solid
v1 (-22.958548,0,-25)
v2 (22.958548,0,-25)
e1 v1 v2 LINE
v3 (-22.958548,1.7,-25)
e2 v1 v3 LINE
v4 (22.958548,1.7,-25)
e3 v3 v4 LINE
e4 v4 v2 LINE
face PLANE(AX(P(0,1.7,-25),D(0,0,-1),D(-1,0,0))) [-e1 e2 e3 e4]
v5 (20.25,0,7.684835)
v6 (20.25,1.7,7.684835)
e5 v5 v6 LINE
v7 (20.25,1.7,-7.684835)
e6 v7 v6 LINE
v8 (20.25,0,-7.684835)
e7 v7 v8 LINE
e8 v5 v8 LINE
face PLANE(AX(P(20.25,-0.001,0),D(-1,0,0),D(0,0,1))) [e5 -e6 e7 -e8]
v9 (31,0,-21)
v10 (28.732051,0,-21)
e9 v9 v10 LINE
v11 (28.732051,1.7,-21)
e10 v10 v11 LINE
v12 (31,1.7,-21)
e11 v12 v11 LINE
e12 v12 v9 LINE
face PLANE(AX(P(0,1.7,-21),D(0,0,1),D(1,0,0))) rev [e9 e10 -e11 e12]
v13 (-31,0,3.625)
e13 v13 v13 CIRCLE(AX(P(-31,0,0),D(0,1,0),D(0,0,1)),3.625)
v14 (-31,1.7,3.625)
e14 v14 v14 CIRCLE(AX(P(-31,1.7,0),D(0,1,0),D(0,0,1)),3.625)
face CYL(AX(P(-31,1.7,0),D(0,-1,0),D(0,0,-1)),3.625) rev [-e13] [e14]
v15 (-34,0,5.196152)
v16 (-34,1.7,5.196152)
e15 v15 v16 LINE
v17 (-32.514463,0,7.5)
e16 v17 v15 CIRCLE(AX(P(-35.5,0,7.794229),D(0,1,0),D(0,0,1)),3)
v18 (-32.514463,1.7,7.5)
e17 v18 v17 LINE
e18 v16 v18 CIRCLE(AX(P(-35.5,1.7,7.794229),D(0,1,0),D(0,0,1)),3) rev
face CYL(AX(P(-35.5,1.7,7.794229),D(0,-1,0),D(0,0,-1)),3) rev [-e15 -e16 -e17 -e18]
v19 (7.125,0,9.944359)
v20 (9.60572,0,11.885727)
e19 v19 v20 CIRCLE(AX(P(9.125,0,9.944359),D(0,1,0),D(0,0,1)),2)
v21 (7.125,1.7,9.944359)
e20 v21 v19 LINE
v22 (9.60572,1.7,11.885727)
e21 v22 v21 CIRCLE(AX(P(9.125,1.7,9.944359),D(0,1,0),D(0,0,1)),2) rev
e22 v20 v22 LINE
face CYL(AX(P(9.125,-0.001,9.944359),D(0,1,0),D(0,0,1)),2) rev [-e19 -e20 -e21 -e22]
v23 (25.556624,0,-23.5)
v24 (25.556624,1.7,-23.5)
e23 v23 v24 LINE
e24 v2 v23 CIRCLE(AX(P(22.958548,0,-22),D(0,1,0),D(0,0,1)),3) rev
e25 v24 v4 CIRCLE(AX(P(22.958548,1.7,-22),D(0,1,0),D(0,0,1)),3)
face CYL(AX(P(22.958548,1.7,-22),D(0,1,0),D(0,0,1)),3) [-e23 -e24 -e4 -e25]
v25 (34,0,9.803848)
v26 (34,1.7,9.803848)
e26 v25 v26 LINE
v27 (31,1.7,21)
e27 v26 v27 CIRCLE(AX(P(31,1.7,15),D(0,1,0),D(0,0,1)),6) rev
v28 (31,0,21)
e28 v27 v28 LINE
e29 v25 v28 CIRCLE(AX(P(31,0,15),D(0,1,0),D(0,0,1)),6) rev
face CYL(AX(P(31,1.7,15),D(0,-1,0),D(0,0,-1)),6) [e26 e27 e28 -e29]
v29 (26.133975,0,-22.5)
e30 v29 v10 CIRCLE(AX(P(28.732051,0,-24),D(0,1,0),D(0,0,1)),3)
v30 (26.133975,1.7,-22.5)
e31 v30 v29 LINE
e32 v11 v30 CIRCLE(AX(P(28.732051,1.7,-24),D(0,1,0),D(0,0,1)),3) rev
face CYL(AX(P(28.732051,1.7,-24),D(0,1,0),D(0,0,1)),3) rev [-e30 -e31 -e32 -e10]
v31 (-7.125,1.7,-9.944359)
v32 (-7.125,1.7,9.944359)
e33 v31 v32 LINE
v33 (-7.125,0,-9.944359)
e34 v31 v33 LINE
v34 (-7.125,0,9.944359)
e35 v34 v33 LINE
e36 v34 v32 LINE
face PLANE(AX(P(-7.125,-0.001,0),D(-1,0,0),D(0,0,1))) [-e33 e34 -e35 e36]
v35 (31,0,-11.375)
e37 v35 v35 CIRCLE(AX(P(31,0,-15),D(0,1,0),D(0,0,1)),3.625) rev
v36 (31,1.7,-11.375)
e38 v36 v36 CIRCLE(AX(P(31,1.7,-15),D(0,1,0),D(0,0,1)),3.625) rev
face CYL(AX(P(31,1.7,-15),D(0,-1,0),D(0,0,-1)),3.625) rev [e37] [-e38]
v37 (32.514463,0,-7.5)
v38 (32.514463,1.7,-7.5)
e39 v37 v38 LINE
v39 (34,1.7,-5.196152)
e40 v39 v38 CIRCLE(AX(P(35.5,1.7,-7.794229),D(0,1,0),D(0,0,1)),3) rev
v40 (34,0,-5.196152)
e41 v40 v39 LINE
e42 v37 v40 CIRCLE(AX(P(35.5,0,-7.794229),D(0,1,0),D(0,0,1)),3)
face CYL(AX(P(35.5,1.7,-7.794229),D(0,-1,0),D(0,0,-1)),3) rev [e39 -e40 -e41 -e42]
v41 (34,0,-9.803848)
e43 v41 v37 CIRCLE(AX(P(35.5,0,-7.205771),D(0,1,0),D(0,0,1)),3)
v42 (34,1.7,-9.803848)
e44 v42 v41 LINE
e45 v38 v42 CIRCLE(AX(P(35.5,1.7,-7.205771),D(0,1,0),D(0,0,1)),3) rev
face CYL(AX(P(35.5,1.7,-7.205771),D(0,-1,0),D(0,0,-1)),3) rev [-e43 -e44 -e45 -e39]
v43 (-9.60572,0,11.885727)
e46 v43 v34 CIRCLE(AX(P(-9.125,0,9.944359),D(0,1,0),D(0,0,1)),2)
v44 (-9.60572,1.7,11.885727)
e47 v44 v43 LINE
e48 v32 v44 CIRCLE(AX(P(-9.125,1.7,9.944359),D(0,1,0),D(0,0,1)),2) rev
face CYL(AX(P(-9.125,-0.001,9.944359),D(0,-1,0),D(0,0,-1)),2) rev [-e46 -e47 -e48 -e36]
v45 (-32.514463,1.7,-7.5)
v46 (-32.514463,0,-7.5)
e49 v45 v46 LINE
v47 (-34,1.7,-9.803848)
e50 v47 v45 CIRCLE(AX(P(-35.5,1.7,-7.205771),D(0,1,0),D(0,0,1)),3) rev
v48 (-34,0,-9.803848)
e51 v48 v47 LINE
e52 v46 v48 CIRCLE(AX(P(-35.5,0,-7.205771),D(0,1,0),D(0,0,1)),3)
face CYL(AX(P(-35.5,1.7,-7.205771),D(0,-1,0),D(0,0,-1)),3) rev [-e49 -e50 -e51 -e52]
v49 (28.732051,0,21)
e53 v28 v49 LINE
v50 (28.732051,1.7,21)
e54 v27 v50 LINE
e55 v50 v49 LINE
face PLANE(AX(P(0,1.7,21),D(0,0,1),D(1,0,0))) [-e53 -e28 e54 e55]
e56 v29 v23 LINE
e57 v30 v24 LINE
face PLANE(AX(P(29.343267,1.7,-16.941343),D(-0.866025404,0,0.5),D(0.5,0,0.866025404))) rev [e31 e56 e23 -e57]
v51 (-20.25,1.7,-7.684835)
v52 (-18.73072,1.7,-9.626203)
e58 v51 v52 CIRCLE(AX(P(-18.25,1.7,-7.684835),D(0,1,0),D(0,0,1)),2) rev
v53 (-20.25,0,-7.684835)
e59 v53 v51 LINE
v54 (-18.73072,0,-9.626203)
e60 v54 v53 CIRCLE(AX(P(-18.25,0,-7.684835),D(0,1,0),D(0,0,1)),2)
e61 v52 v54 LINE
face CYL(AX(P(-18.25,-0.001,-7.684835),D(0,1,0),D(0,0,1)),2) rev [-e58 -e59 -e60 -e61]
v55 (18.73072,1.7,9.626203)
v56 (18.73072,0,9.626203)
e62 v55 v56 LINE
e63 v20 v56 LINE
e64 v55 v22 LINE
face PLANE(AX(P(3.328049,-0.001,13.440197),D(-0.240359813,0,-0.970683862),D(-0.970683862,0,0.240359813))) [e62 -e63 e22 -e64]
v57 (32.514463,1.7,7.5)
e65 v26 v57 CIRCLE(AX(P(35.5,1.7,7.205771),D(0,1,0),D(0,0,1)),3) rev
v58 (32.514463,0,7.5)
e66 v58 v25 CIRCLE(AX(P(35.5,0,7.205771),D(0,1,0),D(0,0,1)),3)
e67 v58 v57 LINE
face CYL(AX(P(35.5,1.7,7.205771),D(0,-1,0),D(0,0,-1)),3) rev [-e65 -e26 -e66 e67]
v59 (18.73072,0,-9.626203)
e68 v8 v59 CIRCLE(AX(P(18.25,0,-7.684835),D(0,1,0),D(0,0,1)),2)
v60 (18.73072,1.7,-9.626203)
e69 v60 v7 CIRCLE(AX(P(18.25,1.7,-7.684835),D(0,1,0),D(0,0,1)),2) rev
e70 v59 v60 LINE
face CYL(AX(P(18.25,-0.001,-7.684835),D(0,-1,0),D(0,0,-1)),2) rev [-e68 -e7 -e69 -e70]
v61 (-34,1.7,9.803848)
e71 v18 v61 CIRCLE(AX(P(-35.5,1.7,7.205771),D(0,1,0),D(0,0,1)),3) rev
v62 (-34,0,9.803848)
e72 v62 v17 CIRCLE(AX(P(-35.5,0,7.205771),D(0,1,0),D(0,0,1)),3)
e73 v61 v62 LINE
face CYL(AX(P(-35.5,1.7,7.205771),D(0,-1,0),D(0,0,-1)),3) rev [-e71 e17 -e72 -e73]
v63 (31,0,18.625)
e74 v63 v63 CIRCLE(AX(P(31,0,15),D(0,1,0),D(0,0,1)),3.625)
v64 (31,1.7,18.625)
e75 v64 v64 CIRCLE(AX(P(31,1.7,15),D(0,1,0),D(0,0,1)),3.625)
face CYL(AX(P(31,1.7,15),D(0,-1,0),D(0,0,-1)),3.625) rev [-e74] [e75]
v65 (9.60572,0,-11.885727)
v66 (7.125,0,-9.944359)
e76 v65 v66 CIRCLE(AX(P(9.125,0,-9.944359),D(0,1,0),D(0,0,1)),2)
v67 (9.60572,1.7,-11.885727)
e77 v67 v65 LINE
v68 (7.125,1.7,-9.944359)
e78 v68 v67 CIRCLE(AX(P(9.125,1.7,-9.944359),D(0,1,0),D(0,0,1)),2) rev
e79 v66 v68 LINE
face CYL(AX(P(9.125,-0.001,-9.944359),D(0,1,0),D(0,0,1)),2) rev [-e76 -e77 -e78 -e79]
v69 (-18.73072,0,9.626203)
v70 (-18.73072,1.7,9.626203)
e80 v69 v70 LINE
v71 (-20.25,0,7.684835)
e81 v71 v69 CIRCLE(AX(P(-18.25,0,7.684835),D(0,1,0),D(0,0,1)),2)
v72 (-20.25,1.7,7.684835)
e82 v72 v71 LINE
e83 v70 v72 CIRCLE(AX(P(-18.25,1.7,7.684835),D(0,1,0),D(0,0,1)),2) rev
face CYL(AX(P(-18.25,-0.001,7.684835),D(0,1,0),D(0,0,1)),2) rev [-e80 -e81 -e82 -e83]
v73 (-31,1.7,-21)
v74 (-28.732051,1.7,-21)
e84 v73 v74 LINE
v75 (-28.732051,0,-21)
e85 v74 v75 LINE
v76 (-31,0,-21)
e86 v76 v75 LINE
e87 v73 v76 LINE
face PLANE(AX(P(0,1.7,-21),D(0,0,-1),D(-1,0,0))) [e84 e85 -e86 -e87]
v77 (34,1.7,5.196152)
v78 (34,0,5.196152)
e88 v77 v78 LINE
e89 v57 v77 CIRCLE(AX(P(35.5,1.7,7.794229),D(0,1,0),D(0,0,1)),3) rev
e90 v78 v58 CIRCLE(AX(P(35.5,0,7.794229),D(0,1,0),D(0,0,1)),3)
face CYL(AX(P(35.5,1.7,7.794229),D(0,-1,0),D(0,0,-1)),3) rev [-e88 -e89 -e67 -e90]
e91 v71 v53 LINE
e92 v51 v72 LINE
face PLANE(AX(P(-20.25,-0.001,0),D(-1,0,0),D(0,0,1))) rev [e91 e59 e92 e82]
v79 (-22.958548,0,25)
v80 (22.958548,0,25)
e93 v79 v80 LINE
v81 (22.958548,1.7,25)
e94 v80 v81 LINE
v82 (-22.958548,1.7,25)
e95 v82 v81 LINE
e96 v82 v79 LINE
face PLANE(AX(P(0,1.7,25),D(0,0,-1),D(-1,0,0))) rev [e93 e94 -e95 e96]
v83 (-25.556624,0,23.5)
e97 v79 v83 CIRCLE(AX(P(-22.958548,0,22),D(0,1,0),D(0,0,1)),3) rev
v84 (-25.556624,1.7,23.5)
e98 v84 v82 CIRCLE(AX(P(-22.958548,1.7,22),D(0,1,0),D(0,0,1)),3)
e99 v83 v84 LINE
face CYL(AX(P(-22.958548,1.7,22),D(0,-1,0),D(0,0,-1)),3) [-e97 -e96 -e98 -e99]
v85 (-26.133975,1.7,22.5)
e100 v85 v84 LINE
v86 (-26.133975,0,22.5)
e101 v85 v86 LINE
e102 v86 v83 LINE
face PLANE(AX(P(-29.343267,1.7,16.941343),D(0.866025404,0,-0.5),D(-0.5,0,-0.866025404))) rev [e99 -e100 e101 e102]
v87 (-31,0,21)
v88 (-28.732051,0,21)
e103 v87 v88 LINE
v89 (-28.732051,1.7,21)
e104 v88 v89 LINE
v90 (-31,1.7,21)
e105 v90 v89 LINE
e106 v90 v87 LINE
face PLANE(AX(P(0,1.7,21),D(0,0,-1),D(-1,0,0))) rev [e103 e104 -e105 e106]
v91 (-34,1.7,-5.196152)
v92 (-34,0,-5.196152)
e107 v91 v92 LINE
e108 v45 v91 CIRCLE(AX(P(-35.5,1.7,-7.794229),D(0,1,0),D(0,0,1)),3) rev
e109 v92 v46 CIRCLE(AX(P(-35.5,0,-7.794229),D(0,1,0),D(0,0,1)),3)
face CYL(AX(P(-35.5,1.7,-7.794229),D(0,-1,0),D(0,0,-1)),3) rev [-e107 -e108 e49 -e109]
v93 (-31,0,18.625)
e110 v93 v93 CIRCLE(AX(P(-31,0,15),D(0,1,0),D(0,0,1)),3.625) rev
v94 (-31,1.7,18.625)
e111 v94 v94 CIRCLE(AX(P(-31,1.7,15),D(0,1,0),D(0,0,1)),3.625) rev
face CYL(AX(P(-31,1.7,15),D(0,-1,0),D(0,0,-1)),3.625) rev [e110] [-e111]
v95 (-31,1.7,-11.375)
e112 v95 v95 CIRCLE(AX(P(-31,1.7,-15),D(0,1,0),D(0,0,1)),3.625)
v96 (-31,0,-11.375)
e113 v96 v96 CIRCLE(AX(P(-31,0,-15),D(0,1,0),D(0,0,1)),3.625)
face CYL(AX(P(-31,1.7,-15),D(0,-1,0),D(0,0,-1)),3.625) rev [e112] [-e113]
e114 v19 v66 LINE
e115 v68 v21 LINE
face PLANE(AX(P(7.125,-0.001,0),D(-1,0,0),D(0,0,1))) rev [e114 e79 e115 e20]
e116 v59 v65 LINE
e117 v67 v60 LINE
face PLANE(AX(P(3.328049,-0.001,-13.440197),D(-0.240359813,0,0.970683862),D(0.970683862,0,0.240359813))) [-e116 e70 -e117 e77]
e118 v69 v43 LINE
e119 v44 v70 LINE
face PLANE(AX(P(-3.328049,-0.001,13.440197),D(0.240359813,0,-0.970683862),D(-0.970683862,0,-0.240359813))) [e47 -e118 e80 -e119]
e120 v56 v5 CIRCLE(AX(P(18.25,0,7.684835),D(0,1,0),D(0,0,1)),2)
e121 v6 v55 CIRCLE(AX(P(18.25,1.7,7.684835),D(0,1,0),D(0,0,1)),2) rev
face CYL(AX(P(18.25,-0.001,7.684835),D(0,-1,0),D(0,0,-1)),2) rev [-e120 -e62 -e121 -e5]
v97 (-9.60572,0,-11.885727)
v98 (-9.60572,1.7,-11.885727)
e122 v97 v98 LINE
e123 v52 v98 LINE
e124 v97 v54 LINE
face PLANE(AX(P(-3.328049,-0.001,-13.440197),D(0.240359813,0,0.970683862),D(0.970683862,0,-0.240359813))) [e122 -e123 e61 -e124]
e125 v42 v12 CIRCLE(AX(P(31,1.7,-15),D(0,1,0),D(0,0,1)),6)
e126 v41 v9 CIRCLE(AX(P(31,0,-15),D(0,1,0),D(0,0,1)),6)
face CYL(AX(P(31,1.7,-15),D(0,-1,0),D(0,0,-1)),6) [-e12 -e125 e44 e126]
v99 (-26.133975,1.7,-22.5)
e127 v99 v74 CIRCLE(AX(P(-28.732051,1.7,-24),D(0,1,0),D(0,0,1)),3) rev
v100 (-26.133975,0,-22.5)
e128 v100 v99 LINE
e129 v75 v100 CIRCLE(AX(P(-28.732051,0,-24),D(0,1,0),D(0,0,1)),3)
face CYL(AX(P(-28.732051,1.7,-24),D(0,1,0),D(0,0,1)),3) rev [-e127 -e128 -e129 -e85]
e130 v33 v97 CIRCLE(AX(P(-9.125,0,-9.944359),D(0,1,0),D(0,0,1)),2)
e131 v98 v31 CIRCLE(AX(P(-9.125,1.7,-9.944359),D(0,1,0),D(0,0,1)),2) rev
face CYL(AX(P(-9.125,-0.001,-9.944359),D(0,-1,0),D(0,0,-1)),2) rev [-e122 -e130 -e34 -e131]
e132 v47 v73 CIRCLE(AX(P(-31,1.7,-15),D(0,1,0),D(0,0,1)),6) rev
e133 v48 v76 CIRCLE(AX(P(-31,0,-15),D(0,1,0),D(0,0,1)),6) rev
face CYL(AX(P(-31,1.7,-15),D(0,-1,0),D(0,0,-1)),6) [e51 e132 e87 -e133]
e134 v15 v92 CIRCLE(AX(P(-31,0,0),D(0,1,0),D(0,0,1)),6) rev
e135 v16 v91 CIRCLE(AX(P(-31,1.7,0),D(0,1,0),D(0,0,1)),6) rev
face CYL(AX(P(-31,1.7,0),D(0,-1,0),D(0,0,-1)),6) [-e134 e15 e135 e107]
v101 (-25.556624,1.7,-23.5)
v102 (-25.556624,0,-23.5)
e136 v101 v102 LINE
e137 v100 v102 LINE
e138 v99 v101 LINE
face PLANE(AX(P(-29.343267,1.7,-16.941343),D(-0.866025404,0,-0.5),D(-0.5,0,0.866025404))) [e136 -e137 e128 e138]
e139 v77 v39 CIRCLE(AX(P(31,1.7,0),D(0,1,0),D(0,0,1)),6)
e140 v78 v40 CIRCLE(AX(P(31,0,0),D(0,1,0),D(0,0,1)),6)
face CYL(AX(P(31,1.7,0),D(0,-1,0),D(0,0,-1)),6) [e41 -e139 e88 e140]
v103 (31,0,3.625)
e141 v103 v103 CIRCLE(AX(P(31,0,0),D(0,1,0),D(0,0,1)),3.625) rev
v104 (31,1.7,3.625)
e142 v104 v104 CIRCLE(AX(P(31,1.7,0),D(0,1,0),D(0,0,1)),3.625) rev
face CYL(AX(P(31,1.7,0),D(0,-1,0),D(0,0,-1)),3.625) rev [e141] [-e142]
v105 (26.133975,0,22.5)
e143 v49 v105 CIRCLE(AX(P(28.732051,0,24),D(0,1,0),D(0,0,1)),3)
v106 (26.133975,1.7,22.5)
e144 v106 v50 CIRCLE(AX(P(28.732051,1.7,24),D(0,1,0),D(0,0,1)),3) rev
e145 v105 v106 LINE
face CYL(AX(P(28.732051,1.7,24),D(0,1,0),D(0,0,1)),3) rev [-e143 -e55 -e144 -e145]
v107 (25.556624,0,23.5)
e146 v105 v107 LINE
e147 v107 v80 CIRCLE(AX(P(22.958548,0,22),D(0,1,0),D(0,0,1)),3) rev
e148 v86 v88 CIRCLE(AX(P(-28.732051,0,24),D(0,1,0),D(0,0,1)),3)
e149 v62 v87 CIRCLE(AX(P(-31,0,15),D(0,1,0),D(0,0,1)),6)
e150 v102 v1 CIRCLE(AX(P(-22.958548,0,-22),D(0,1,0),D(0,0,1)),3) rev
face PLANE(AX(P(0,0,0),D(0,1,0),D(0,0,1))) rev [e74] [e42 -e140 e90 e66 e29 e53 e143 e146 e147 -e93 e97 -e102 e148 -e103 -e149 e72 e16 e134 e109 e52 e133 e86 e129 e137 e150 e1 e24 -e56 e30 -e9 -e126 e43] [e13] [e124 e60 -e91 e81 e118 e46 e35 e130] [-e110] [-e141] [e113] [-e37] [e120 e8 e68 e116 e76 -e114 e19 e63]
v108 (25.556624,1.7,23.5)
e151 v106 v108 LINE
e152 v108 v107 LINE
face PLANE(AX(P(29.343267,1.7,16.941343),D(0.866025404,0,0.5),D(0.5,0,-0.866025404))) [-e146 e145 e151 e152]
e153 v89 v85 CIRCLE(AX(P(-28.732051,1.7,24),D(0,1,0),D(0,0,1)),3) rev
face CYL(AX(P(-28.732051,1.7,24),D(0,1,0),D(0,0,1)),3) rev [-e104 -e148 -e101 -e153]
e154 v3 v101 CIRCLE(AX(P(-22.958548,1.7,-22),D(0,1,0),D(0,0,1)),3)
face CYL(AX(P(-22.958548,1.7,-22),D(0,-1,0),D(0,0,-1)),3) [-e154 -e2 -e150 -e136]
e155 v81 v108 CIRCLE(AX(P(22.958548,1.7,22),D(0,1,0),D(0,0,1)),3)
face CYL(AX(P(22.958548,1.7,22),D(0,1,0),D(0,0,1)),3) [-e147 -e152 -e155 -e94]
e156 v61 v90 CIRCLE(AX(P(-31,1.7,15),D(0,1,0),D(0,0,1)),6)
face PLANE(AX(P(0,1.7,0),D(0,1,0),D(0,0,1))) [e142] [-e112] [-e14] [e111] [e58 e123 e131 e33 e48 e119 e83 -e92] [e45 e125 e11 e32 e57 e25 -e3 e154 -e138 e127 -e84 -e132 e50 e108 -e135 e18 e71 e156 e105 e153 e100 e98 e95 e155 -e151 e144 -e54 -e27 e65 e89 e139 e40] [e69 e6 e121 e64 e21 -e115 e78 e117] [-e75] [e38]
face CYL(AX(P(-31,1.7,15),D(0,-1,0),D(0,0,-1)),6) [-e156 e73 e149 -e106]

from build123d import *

# Parameters (mm, degrees)
SKETCH1_R           = 6
SKETCH1_R_2         = 3.625
BOSS_EXTRUDE1_DEPTH = 1.7
CUT_EXTRUDE1_REACH  = 46.687
SKETCH2_W           = 13.125
SKETCH2_H           = 18.5
FILLET1_R           = 3
FILLET2_R           = 2


with BuildPart() as part:
    # Sketch1 → Boss-Extrude1 (new body)
    # profile 1 of 7: a face of its own
    with BuildSketch(Plane(origin=(0, 0, 0), x_dir=(1, 0, 0), z_dir=(0, 1, 0))):
        with BuildLine():
            Line((24.690598923, 25), (-24.690598923, 25))
            Line((-24.690598923, 25), (-27, 21))
            Line((-27, 21), (-31, 21))
            ThreePointArc((-31, 21), (-26.757359313, 19.242640687), (-25, 15))
            ThreePointArc((-25, 15), (-27.325765386, 10.25658351), (-32.5, 9.190524981))
            Line((-32.5, 9.190524981), (-32.5, 5.809475019))
            ThreePointArc((-32.5, 5.809475019), (-27.325765386, 4.74341649), (-25, 0))
            ThreePointArc((-25, 0), (-27.325765386, -4.74341649), (-32.5, -5.809475019))
            Line((-32.5, -5.809475019), (-32.5, -9.190524981))
            ThreePointArc((-32.5, -9.190524981), (-27.325765386, -10.25658351), (-25, -15))
            ThreePointArc((-25, -15), (-26.757359313, -19.242640687), (-31, -21))
            Line((-31, -21), (-27, -21))
            Line((-27, -21), (-24.690598923, -25))
            Line((-24.690598923, -25), (24.690598923, -25))
            Line((24.690598923, -25), (27, -21))
            Line((27, -21), (31, -21))
            ThreePointArc((31, -21), (25.047821822, -14.243974245), (32.5, -9.190524981))
            Line((32.5, -9.190524981), (32.5, -5.809475019))
            ThreePointArc((32.5, -5.809475019), (25, 0), (32.5, 5.809475019))
            Line((32.5, 5.809475019), (32.5, 9.190524981))
            ThreePointArc((32.5, 9.190524981), (25.047821822, 14.243974245), (31, 21))
            Line((31, 21), (27, 21))
            Line((27, 21), (24.690598923, 25))
        make_face()
    # profile 2 of 7: a face of its own
    with BuildSketch(Plane(origin=(0, 0, 0), x_dir=(1, 0, 0), z_dir=(0, 1, 0))):
        with Locations((-31, 15)):
            Circle(SKETCH1_R)
        with Locations(Location((-31, 15, 0), (0, 0, 270))):
            Circle(SKETCH1_R_2, mode=Mode.SUBTRACT)
    # profile 3 of 7: a face of its own
    with BuildSketch(Plane(origin=(0, 0, 0), x_dir=(1, 0, 0), z_dir=(0, 1, 0))):
        with Locations((-31, 0)):
            Circle(SKETCH1_R)
        with Locations(Location((-31, 0, 0), (0, 0, 270))):
            Circle(SKETCH1_R_2, mode=Mode.SUBTRACT)
    # profile 4 of 7: a face of its own
    with BuildSketch(Plane(origin=(0, 0, 0), x_dir=(1, 0, 0), z_dir=(0, 1, 0))):
        with Locations((-31, -15)):
            Circle(SKETCH1_R)
        with Locations(Location((-31, -15, 0), (0, 0, 270))):
            Circle(SKETCH1_R_2, mode=Mode.SUBTRACT)
    # profile 5 of 7: a face of its own
    with BuildSketch(Plane(origin=(0, 0, 0), x_dir=(1, 0, 0), z_dir=(0, 1, 0))):
        with Locations((31, -15)):
            Circle(SKETCH1_R)
        with Locations(Location((31, -15, 0), (0, 0, 270))):
            Circle(SKETCH1_R_2, mode=Mode.SUBTRACT)
    # profile 6 of 7: a face of its own
    with BuildSketch(Plane(origin=(0, 0, 0), x_dir=(1, 0, 0), z_dir=(0, 1, 0))):
        with Locations((31, 0)):
            Circle(SKETCH1_R)
        with Locations(Location((31, 0, 0), (0, 0, 270))):
            Circle(SKETCH1_R_2, mode=Mode.SUBTRACT)
    # profile 7 of 7: a face of its own
    with BuildSketch(Plane(origin=(0, 0, 0), x_dir=(1, 0, 0), z_dir=(0, 1, 0))):
        with Locations((31, 15)):
            Circle(SKETCH1_R)
        with Locations(Location((31, 15, 0), (0, 0, 270))):
            Circle(SKETCH1_R_2, mode=Mode.SUBTRACT)
    extrude(amount=BOSS_EXTRUDE1_DEPTH)

    # Sketch2 → Cut-Extrude1 (cut, up to next)
    with BuildSketch(Plane(origin=(0, 1.7, 0), x_dir=(1, 0, 0), z_dir=(0, 1, 0)), mode=Mode.PRIVATE) as cut_extrude1_sk1:
        with Locations((-13.6875, 0)):
            Rectangle(SKETCH2_W, SKETCH2_H)
    cut_extrude1_tool1 = extrude(cut_extrude1_sk1.sketch, amount=-CUT_EXTRUDE1_REACH, mode=Mode.PRIVATE) & part.part
    # Sketch2 → Cut-Extrude1 (cut, up to next)
    with BuildSketch(Plane(origin=(0, 1.7, 0), x_dir=(1, 0, 0), z_dir=(0, 1, 0)), mode=Mode.PRIVATE) as cut_extrude1_sk2:
        Polygon((-7.125, 9.25), (-7.125, 12.5), (-20.25, 9.25), align=None)
    cut_extrude1_tool2 = extrude(cut_extrude1_sk2.sketch, amount=-CUT_EXTRUDE1_REACH, mode=Mode.PRIVATE) & part.part
    # Sketch2 → Cut-Extrude1 (cut, up to next)
    with BuildSketch(Plane(origin=(0, 1.7, 0), x_dir=(1, 0, 0), z_dir=(0, 1, 0)), mode=Mode.PRIVATE) as cut_extrude1_sk3:
        Polygon((-7.125, -12.5), (-7.125, -9.25), (-20.25, -9.25), align=None)
    cut_extrude1_tool3 = extrude(cut_extrude1_sk3.sketch, amount=-CUT_EXTRUDE1_REACH, mode=Mode.PRIVATE) & part.part
    # Sketch2 → Cut-Extrude1 (cut, up to next)
    with BuildSketch(Plane(origin=(0, 1.7, 0), x_dir=(1, 0, 0), z_dir=(0, 1, 0)), mode=Mode.PRIVATE) as cut_extrude1_sk4:
        Polygon((7.125, -12.5), (20.25, -9.25), (7.125, -9.25), align=None)
    cut_extrude1_tool4 = extrude(cut_extrude1_sk4.sketch, amount=-CUT_EXTRUDE1_REACH, mode=Mode.PRIVATE) & part.part
    # Sketch2 → Cut-Extrude1 (cut, up to next)
    with BuildSketch(Plane(origin=(0, 1.7, 0), x_dir=(1, 0, 0), z_dir=(0, 1, 0)), mode=Mode.PRIVATE) as cut_extrude1_sk5:
        with Locations((13.6875, 0)):
            Rectangle(SKETCH2_W, SKETCH2_H)
    cut_extrude1_tool5 = extrude(cut_extrude1_sk5.sketch, amount=-CUT_EXTRUDE1_REACH, mode=Mode.PRIVATE) & part.part
    # Sketch2 → Cut-Extrude1 (cut, up to next)
    with BuildSketch(Plane(origin=(0, 1.7, 0), x_dir=(1, 0, 0), z_dir=(0, 1, 0)), mode=Mode.PRIVATE) as cut_extrude1_sk6:
        Polygon((20.25, 9.25), (7.125, 12.5), (7.125, 9.25), align=None)
    cut_extrude1_tool6 = extrude(cut_extrude1_sk6.sketch, amount=-CUT_EXTRUDE1_REACH, mode=Mode.PRIVATE) & part.part
    add(cut_extrude1_tool1.solids().sort_by_distance((-13.6875, 1.7, 0))[0], mode=Mode.SUBTRACT)
    add(cut_extrude1_tool2.solids().sort_by_distance((-11.5, 1.7, -10.333333))[0], mode=Mode.SUBTRACT)
    add(cut_extrude1_tool3.solids().sort_by_distance((-11.5, 1.7, 10.333333))[0], mode=Mode.SUBTRACT)
    add(cut_extrude1_tool4.solids().sort_by_distance((11.5, 1.7, 10.333333))[0], mode=Mode.SUBTRACT)
    add(cut_extrude1_tool5.solids().sort_by_distance((13.6875, 1.7, 0))[0], mode=Mode.SUBTRACT)
    add(cut_extrude1_tool6.solids().sort_by_distance((11.5, 1.7, -10.333333))[0], mode=Mode.SUBTRACT)

    # Fillet1
    # the kernel refuses this fillet: 3 mm, written as the material it adds along each edge
    with BuildSketch(Plane(origin=(32.5, 0, 9.190524981), x_dir=(0, 0, -1), z_dir=(0, 1, 0)), Plane(origin=(32.5, 0, -5.809475019), x_dir=(0, 0, -1), z_dir=(0, 1, 0))) as fillet1_piece_1:
        with BuildLine():
            CenterArc((1.984753615, -3), FILLET1_R, 90, 60)
            ThreePointArc((-0.613322597, -1.5), (-0.255786259, -0.770801874), (0, 0))
            Line((0, 0), (1.984753615, 0))
        make_face()
    extrude(amount=1.7)
    with BuildSketch(Plane(origin=(32.5, 0, 5.809475019), x_dir=(0.9256147934109572, 0, -0.3784669790335627), z_dir=(0, 1, 0)), Plane(origin=(32.5, 0, -9.190524981), x_dir=(0.9256147934109562, 0, -0.378466979033565), z_dir=(0, 1, 0))) as fillet1_piece_2:
        with BuildLine():
            CenterArc((2.025680676, -2.972518244), FILLET1_R, 97.761243907, 60)
            Line((-0.751163705, -1.837117307), (0, 0))
            ThreePointArc((0, 0), (0.81027227, -0.054963512), (1.62054454, 0))
        make_face()
    extrude(amount=1.7)
    with BuildSketch(Plane(origin=(-32.5, 0, 9.190524981), x_dir=(0, 0, -1), z_dir=(0, 1, 0)), Plane(origin=(-32.5, 0, -5.809475019), x_dir=(0, 0, -1), z_dir=(0, 1, 0))) as fillet1_piece_3:
        with BuildLine():
            CenterArc((1.984753615, 3), FILLET1_R, 210, 60)
            ThreePointArc((-0.613322597, 1.5), (-0.255786259, 0.770801874), (0, 0))
            Line((0, 0), (1.984753615, 0))
        make_face()
    extrude(amount=1.7)
    with BuildSketch(Plane(origin=(-32.5, 0, 5.809475019), x_dir=(-0.9256147934109573, 0, -0.3784669790335622), z_dir=(0, 1, 0)), Plane(origin=(-32.5, 0, -9.190524981), x_dir=(-0.9256147934109568, 0, -0.37846697903356347), z_dir=(0, 1, 0))) as fillet1_piece_4:
        with BuildLine():
            CenterArc((2.025680676, 2.972518244), FILLET1_R, 202.238756093, 60)
            Line((-0.751163705, 1.837117307), (0, 0))
            ThreePointArc((0, 0), (0.81027227, 0.054963512), (1.62054454, 0))
        make_face()
    extrude(amount=1.7)
    with BuildSketch(Plane(origin=(-27, 0, 21), x_dir=(0.49999999999999767, 0, 0.8660254037844399), z_dir=(0, 1, 0)), Plane(origin=(27, 0, 21), x_dir=(1, 0, 0), z_dir=(0, 1, 0))) as fillet1_piece_5:
        with BuildLine():
            CenterArc((FILLET1_R * 0.57735026919, -FILLET1_R), FILLET1_R, 90, 60)
            Line((-FILLET1_R * 0.288675134595, -FILLET1_R * 0.5), (0, 0))
            Line((0, 0), (FILLET1_R * 0.57735026919, 0))
        make_face()
    extrude(amount=1.7)
    with BuildSketch(Plane(origin=(27, 0, -21), x_dir=(1, 0, 0), z_dir=(0, 1, 0)), Plane(origin=(-27, 0, -21), x_dir=(0.49999999999999767, 0, -0.8660254037844399), z_dir=(0, 1, 0))) as fillet1_piece_6:
        with BuildLine():
            CenterArc((FILLET1_R * 0.57735026919, FILLET1_R), FILLET1_R, 210, 60)
            Line((-FILLET1_R * 0.288675134595, FILLET1_R * 0.5), (0, 0))
            Line((0, 0), (FILLET1_R * 0.57735026919, 0))
        make_face()
    extrude(amount=1.7)
    # the kernel refuses this fillet: 3 mm, written as the material it takes off along each edge
    with BuildSketch(Plane(origin=(-24.690598923, -4.330127019, 25), x_dir=(1, 0, 0), z_dir=(0, 1, 0)), Plane(origin=(24.690598923, -4.330127019, 25), x_dir=(0.49999999999999767, 0, -0.8660254037844399), z_dir=(0, 1, 0))) as fillet1_2_piece_1:
        with BuildLine():
            CenterArc((FILLET1_R * 0.57735026919, FILLET1_R), FILLET1_R, 210, 60)
            Line((-FILLET1_R * 0.288675134595, FILLET1_R * 0.5), (0, 0))
            Line((0, 0), (FILLET1_R * 0.57735026919, 0))
        make_face()
    extrude(amount=10.360254038, mode=Mode.SUBTRACT)
    with BuildSketch(Plane(origin=(24.690598923, -4.330127019, -25), x_dir=(0.49999999999999767, 0, 0.8660254037844399), z_dir=(0, 1, 0)), Plane(origin=(-24.690598923, -4.330127019, -25), x_dir=(1, 0, 0), z_dir=(0, 1, 0))) as fillet1_2_piece_2:
        with BuildLine():
            CenterArc((FILLET1_R * 0.57735026919, -FILLET1_R), FILLET1_R, 90, 60)
            Line((-FILLET1_R * 0.288675134595, -FILLET1_R * 0.5), (0, 0))
            Line((0, 0), (FILLET1_R * 0.57735026919, 0))
        make_face()
    extrude(amount=10.360254038, mode=Mode.SUBTRACT)

    # Fillet2
    fillet2_edges = [part.edges().sort_by_distance(p)[0] for p in [
        (-20.25, 0.85, 9.25),
        (-20.25, 0.85, -9.25),
        (-7.125, 0.85, -12.5),
        (-7.125, 0.85, 12.5),
        (20.25, 0.85, 9.25),
        (7.125, 0.85, 12.5),
        (7.125, 0.85, -12.5),
        (20.25, 0.85, -9.25),
    ]]
    fillet(fillet2_edges, radius=FILLET2_R)


solid = part.part
